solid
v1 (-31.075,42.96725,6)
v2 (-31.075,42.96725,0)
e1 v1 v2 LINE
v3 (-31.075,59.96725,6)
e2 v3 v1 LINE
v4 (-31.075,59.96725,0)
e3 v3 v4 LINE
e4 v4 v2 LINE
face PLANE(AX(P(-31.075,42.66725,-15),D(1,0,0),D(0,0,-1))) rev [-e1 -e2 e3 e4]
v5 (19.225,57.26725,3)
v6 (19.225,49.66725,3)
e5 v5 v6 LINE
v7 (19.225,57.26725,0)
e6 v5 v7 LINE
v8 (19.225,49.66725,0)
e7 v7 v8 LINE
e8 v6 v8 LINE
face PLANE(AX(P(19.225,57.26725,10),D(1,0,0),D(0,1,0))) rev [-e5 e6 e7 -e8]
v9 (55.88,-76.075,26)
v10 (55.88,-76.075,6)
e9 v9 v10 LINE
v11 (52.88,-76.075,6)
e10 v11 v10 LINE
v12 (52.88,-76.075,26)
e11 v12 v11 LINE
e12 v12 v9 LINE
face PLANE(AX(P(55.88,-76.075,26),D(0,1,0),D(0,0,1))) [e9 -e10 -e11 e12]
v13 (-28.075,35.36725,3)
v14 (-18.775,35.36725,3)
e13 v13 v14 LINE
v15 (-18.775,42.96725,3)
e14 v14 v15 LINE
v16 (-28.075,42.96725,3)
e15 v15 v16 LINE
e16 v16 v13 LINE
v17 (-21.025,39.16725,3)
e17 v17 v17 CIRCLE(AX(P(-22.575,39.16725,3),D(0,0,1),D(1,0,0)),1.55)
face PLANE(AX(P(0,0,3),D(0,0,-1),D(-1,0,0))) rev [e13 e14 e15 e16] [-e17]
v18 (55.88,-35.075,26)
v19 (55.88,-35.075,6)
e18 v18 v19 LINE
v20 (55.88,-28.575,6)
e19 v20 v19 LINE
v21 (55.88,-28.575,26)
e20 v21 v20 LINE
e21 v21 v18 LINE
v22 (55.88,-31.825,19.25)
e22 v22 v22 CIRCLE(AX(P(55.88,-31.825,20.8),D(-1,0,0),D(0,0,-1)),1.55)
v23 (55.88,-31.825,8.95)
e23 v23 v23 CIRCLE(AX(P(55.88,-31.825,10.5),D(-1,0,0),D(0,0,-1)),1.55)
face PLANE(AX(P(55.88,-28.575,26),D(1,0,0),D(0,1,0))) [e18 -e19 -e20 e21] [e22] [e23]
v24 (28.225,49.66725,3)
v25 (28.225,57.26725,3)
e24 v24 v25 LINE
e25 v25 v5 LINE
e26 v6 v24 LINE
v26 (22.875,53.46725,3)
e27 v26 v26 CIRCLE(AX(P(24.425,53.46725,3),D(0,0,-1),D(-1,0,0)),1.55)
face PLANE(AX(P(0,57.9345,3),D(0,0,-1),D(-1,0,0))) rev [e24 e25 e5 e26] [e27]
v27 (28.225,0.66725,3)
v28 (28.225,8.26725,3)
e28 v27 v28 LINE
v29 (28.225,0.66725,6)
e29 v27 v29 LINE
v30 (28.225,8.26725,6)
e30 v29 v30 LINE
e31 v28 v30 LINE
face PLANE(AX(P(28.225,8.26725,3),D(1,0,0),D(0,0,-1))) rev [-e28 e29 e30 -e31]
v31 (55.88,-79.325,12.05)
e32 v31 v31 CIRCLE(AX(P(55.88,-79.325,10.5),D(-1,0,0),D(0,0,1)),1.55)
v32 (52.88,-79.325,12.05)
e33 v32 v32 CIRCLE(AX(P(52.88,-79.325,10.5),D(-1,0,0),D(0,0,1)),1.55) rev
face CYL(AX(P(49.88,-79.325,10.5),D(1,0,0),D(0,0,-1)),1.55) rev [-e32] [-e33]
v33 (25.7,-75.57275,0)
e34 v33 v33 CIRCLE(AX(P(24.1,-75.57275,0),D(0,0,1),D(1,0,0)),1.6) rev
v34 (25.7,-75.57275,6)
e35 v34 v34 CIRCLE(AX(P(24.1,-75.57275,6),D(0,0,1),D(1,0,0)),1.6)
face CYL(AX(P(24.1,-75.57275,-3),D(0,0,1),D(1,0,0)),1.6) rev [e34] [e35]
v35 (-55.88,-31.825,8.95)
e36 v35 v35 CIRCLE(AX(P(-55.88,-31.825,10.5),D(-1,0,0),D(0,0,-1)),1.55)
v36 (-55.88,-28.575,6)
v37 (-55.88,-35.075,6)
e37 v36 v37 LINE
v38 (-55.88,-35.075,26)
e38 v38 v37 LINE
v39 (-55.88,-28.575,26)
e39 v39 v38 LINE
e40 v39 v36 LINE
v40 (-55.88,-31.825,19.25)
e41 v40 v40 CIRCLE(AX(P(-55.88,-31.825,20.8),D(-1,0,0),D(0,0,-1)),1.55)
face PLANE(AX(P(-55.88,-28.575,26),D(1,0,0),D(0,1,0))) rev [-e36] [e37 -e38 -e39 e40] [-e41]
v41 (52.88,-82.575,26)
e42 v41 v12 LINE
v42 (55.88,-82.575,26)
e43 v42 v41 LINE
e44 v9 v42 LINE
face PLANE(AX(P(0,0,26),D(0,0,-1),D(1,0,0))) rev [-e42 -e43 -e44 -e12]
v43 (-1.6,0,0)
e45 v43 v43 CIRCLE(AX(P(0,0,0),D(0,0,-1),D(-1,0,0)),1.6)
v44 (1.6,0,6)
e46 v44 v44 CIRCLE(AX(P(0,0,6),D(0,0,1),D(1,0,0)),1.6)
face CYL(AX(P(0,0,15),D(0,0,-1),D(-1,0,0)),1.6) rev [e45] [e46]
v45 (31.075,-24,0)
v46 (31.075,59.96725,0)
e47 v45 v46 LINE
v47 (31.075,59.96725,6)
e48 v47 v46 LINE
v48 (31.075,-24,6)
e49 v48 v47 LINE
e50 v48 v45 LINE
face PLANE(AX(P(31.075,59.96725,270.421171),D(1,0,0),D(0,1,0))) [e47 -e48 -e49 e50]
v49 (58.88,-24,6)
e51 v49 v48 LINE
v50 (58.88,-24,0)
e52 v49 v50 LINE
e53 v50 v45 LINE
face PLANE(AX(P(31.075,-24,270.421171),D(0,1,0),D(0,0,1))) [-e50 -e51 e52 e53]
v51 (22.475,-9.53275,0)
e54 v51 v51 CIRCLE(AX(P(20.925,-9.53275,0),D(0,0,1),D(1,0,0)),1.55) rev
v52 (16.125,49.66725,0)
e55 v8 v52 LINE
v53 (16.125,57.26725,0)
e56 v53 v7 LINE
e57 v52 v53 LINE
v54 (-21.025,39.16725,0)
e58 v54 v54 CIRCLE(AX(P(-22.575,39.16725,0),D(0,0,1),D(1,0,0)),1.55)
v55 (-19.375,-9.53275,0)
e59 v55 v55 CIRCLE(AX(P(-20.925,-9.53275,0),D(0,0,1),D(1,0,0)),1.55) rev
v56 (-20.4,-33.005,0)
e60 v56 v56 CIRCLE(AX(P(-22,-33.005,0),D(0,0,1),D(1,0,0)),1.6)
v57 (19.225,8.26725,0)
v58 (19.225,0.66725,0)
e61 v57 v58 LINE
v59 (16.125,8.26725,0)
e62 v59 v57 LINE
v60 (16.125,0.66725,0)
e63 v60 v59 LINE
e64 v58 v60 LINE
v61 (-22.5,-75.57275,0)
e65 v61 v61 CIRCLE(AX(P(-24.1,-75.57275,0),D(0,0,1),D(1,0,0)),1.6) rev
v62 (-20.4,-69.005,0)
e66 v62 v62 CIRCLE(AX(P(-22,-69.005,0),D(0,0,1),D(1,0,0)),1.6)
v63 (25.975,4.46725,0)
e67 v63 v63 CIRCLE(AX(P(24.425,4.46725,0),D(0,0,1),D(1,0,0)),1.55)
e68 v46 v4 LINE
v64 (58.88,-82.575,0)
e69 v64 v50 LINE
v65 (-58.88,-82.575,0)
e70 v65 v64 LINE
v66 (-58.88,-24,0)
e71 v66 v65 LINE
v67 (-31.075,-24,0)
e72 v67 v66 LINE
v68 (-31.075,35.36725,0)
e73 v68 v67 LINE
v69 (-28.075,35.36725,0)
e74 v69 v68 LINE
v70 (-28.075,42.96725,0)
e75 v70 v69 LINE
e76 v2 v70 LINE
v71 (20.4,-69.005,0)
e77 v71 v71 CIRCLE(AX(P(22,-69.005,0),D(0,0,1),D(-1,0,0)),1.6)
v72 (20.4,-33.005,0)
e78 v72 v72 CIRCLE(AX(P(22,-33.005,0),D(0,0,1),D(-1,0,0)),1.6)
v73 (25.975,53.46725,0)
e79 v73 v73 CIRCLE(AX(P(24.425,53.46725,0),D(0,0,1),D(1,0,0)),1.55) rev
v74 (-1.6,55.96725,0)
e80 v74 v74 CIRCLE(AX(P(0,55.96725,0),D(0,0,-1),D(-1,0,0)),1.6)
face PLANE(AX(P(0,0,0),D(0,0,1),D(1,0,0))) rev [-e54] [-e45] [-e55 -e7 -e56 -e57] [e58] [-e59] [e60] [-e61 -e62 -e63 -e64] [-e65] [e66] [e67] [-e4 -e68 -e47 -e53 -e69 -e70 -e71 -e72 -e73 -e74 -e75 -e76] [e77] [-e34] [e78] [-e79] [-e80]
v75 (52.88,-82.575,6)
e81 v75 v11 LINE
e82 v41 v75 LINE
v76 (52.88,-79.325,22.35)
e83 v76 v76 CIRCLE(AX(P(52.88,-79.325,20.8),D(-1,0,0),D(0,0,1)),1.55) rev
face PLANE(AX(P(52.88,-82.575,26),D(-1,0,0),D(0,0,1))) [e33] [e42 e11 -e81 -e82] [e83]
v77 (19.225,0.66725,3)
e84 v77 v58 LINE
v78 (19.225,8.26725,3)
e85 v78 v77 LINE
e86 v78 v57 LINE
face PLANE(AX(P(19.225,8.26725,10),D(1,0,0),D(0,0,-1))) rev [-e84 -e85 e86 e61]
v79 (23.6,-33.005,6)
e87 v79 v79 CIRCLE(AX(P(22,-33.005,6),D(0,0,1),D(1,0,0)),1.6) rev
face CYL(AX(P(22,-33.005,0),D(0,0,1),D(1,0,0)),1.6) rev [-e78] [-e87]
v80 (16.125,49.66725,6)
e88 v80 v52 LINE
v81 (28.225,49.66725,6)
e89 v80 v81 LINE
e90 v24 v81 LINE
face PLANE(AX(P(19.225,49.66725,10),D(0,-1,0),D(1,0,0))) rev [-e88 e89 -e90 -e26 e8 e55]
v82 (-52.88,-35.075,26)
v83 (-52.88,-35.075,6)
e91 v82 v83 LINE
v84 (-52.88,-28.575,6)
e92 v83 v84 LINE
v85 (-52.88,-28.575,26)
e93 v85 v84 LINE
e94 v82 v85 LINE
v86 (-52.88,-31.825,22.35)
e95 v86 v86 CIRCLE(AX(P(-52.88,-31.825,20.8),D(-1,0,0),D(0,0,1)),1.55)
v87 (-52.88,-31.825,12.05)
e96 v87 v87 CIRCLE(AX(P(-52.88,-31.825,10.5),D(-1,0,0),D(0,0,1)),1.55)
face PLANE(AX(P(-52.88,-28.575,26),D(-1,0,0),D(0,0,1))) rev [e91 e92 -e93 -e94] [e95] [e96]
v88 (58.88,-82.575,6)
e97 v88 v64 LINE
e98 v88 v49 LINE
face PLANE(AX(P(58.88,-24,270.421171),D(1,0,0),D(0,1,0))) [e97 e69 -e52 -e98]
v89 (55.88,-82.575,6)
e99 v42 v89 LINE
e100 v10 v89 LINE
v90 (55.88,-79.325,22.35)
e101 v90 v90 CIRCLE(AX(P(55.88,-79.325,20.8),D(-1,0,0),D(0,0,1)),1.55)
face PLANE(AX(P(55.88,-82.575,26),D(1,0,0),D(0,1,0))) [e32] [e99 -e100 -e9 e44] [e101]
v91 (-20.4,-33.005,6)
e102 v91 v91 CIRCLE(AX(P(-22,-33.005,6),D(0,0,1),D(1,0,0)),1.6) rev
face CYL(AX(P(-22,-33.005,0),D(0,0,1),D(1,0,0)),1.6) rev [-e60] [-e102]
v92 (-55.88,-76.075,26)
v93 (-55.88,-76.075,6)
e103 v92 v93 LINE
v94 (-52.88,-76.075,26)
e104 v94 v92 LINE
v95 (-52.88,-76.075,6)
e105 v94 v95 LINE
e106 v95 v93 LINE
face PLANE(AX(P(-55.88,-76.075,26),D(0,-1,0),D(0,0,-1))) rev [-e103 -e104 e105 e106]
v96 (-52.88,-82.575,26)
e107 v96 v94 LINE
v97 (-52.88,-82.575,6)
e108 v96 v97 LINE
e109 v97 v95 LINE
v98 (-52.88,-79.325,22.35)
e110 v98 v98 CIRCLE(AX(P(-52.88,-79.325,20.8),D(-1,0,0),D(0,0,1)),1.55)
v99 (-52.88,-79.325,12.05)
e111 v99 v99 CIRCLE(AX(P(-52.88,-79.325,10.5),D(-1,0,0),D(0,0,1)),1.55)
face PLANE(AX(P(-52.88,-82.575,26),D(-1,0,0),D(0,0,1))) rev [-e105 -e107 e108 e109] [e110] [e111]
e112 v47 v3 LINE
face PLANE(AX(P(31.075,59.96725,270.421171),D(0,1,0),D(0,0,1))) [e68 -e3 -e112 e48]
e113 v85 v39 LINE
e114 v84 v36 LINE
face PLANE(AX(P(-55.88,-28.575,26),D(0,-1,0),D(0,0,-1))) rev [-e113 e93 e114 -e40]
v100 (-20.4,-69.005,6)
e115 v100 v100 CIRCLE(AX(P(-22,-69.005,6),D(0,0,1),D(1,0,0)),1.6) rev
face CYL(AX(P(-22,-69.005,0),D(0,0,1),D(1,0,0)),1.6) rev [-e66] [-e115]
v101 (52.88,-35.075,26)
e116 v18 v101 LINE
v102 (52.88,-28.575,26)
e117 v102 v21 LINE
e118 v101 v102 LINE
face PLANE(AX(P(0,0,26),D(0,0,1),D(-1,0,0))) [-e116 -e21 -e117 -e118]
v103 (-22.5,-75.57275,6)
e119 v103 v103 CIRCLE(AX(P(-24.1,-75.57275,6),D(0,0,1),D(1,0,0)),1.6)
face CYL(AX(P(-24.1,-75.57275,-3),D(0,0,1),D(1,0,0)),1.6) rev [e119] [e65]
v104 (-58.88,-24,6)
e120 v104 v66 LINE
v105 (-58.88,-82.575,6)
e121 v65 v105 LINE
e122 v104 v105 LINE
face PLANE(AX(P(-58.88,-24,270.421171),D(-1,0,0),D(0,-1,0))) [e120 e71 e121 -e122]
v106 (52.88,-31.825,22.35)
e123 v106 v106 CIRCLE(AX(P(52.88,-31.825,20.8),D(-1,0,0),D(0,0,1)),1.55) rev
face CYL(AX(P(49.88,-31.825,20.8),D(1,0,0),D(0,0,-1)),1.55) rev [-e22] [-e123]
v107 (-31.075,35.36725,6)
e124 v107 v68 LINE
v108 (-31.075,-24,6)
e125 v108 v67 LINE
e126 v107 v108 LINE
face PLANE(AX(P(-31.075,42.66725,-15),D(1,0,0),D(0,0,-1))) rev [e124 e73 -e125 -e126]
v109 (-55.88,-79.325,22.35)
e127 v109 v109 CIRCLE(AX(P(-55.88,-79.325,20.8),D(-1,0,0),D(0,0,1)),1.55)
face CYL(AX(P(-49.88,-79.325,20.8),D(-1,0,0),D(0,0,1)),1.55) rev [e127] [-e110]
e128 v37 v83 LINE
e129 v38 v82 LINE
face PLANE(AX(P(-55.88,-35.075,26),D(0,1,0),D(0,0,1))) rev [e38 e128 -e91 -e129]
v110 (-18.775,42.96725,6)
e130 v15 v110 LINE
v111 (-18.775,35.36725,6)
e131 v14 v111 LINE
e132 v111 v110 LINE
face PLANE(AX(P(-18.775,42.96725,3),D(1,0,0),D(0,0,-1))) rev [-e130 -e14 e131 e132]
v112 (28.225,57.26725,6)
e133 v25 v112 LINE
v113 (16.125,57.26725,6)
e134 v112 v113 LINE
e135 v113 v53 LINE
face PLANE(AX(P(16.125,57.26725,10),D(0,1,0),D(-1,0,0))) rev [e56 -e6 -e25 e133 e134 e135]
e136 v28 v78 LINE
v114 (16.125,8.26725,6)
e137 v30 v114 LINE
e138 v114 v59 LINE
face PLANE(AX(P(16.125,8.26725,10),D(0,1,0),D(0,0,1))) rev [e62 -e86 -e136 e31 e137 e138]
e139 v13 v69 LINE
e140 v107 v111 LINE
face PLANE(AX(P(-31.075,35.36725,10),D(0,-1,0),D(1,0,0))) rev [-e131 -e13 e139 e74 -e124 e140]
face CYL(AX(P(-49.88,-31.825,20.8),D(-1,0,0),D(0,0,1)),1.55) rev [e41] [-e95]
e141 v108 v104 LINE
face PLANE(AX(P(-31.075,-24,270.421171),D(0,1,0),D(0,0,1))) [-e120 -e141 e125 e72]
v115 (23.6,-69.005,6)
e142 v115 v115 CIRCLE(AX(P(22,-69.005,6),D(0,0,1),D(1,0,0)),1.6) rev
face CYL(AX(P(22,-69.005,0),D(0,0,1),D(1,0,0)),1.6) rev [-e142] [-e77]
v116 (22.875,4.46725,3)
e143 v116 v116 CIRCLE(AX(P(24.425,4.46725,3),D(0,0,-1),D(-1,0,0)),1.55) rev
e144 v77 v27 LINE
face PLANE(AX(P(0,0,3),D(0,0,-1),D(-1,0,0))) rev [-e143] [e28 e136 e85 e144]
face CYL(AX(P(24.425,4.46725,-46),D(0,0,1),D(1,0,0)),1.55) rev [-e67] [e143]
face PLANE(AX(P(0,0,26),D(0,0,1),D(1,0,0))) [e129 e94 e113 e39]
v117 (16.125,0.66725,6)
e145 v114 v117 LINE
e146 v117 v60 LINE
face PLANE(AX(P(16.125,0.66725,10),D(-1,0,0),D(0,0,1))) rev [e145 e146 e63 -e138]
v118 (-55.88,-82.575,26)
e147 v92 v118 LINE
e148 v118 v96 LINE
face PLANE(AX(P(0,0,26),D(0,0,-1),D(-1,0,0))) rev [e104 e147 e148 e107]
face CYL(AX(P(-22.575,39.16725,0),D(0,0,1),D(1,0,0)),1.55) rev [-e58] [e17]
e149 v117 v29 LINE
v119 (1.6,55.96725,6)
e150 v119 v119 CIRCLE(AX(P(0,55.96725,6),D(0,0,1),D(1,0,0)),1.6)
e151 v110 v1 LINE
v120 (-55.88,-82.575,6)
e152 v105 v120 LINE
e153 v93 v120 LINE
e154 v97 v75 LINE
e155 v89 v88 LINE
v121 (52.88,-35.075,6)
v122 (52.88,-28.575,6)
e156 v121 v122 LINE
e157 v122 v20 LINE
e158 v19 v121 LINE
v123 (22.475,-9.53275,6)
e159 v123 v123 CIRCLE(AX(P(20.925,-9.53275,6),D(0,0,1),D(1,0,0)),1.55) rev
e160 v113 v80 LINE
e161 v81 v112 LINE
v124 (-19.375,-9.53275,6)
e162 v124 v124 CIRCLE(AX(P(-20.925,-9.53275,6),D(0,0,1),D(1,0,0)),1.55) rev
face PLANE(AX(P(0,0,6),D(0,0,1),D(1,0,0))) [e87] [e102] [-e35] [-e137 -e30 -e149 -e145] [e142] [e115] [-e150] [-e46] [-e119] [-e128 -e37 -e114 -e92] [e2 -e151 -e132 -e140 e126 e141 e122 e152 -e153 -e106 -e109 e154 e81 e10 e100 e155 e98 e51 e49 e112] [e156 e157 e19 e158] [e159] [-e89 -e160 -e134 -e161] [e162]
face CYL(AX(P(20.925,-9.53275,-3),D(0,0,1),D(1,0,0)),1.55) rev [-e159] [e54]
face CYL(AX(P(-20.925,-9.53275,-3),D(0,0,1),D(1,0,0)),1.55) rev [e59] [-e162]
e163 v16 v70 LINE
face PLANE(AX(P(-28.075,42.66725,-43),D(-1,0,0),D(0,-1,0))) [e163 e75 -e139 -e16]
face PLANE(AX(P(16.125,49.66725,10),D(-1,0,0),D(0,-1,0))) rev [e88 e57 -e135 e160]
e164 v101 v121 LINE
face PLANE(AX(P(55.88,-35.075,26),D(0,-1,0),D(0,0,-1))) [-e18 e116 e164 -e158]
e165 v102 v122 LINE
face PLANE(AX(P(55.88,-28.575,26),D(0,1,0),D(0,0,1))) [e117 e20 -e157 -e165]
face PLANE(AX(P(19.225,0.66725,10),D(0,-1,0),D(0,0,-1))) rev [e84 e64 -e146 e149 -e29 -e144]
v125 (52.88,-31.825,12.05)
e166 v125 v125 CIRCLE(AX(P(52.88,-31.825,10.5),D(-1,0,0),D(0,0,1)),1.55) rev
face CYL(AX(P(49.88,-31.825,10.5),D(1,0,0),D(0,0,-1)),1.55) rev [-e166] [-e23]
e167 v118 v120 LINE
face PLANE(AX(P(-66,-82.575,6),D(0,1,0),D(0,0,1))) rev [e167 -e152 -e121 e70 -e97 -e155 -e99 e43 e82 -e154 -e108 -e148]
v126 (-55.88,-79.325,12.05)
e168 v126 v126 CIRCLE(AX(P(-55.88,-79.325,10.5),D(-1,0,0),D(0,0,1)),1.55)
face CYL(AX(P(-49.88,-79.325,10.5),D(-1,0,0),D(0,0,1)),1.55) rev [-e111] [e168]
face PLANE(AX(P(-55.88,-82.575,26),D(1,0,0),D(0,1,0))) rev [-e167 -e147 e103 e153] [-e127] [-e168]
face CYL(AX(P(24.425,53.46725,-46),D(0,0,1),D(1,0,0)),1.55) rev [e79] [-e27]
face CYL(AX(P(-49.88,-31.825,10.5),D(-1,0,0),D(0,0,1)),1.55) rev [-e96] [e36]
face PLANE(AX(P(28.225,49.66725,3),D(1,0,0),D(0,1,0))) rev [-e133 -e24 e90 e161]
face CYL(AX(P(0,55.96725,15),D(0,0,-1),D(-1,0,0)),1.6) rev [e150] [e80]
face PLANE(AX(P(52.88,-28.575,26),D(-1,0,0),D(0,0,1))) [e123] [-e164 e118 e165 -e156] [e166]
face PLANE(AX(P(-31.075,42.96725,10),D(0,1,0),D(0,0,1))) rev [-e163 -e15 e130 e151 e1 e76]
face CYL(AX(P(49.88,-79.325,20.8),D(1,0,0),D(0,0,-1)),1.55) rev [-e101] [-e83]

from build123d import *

# Parameters (mm, degrees)
SKETCH1_W               = 132
SKETCH1_H               = 165.15
BOSS_EXTRUDE1_DEPTH     = 6
SKETCH3_W               = 32
SKETCH3_H               = 54
SKETCH3_W_2             = 26
SKETCH3_H_2             = 48
BOSS_EXTRUDE2_DEPTH     = 17.5
SKETCH4_W               = 32
SKETCH4_H               = 54
BOSS_EXTRUDE3_DEPTH     = 3
SKETCH5_W               = 25
SKETCH5_H               = 17
CUT_EXTRUDE1_DEPTH      = 3
SKETCH6_W               = 12
SKETCH6_H               = 54
BOSS_EXTRUDE4_DEPTH     = 3
SKETCH7_R               = 1.6
CUT_EXTRUDE2_DEPTH      = 108.148871319
SKETCH8_W               = 3
SKETCH8_H               = 6.5
BOSS_EXTRUDE5_DEPTH     = 20
SKETCH9_R               = 1.55
CUT_EXTRUDE3_DEPTH      = 6
CUT_EXTRUDE4_DEPTH      = 3
CUT_EXTRUDE4_DEPTH_BACK = 109.981102146
SKETCH10_R              = 1.6
SKETCH10_R_2            = 1.55
SKETCH11_W              = 2.5
SKETCH11_H              = 7
BOSS_EXTRUDE6_DEPTH     = 19.36
SKETCH12_R              = 1.6
CUT_EXTRUDE5_DEPTH      = 19.36
SKETCH13_W              = 3
SKETCH13_H              = 7
BOSS_EXTRUDE7_DEPTH     = 15
SKETCH14_R              = 2
CUT_EXTRUDE6_DEPTH      = 15
CUT_EXTRUDE7_START      = -6
CUT_EXTRUDE7_DEPTH      = 6
SKETCH16_R              = 1.6
CUT_EXTRUDE8_DEPTH      = 15
SKETCH17_W              = 61.848581877
SKETCH17_H              = 62.95797348
CUT_EXTRUDE9_DEPTH      = 52
SKETCH19_R              = 1.55
CUT_EXTRUDE10_DEPTH     = 52
CUT_EXTRUDE11_DEPTH     = 3
SKETCH21_W              = 2.5
SKETCH21_H              = 7
CUT_EXTRUDE12_DEPTH     = 49
SKETCH22_W              = 3
SKETCH22_H              = 7
CUT_EXTRUDE13_DEPTH     = 49
SKETCH22_3_W            = 3
SKETCH22_3_H            = 7
SKETCH22_3_W_2          = 9
CUT_EXTRUDE14_DEPTH     = 3
SKETCH23_R              = 1.55
CUT_EXTRUDE15_DEPTH     = 3
SKETCH26_W              = 3
SKETCH26_H              = 7.6
SKETCH26_W_2            = 3.1
CUT_EXTRUDE17_DEPTH     = 10
SKETCH27_W              = 9.3
SKETCH27_H              = 7.6
SKETCH27_W_2            = 9
CUT_EXTRUDE18_DEPTH     = 3


# Read off the part's stored shape, not the designer's step: Cut-Extrude7
with BuildPart() as part:
    # Sketch1 → Boss-Extrude1 (new body)
    with BuildSketch(Plane.XY):
        Rectangle(SKETCH1_W, SKETCH1_H)
    extrude(amount=BOSS_EXTRUDE1_DEPTH)

    # Sketch3 → Boss-Extrude2 (add)
    with BuildSketch(Plane.XY.offset(6)):
        with Locations((0, -55.575)):
            Rectangle(SKETCH3_W, SKETCH3_H)
        with Locations((0, -55.575)):
            Rectangle(SKETCH3_W_2, SKETCH3_H_2, mode=Mode.SUBTRACT)
    extrude(amount=BOSS_EXTRUDE2_DEPTH)

    # Sketch4 → Boss-Extrude3 (add)
    with BuildSketch(Plane.XY.offset(23.5)):
        with Locations((0, -55.575)):
            Rectangle(SKETCH4_W, SKETCH4_H)
    extrude(amount=BOSS_EXTRUDE3_DEPTH)

    # Sketch5 → Cut-Extrude1 (cut)
    with BuildSketch(Plane.XZ.offset(82.575)):
        with Locations((0, 14.5)):
            Rectangle(SKETCH5_W, SKETCH5_H)
    extrude(amount=-CUT_EXTRUDE1_DEPTH, mode=Mode.SUBTRACT)

    # Sketch6 → Boss-Extrude4 (add)
    with BuildSketch(Plane.XY.offset(6)):
        with Locations((-22, -55.575)):
            Rectangle(SKETCH6_W, SKETCH6_H)
        with Locations((22, -55.575)):
            Rectangle(SKETCH6_W, SKETCH6_H)
    extrude(amount=BOSS_EXTRUDE4_DEPTH)

    # Sketch7 → Cut-Extrude2 (cut, through all)
    with BuildSketch(Plane.XY.offset(9)):
        with Locations((-22, -69.005)):
            Circle(SKETCH7_R)
        with Locations((-22, -33.005)):
            Circle(SKETCH7_R)
        with Locations(Location((22, -69.005, 0), (0, 0, 180))):
            Circle(SKETCH7_R)
        with Locations(Location((22, -33.005, 0), (0, 0, 180))):
            Circle(SKETCH7_R)
    extrude(amount=-CUT_EXTRUDE2_DEPTH, mode=Mode.SUBTRACT)

    # Sketch8 → Boss-Extrude5 (add)
    with BuildSketch(Plane.XY.offset(6)):
        with Locations((-54.38, -79.325)):
            Rectangle(SKETCH8_W, SKETCH8_H)
        with Locations((-54.38, -31.825)):
            Rectangle(SKETCH8_W, SKETCH8_H)
    boss_extrude5 = extrude(amount=BOSS_EXTRUDE5_DEPTH)

    # Sketch9 → Cut-Extrude3 (cut)
    with BuildSketch(Plane.ZY.offset(55.88)):
        with Locations((10.5, -79.325)):
            Circle(SKETCH9_R)
        with Locations((20.8, -79.325)):
            Circle(SKETCH9_R)
        with Locations((10.5, -31.825)):
            Circle(SKETCH9_R)
        with Locations((20.8, -31.825)):
            Circle(SKETCH9_R)
    cut_extrude3 = extrude(amount=-CUT_EXTRUDE3_DEPTH, mode=Mode.SUBTRACT)

    # Mirror1: Boss-Extrude5, Cut-Extrude3 across plane
    add(boss_extrude5.mirror(Plane(origin=(0, 0, 0), x_dir=(0, 0, 1), z_dir=(1, 0, 0))))
    add(cut_extrude3.mirror(Plane(origin=(0, 0, 0), x_dir=(0, 0, 1), z_dir=(1, 0, 0))), mode=Mode.SUBTRACT)

    # Sketch10 → Cut-Extrude4 (cut, two sides: drawn at the far end of the back side and taken through both)
    with BuildSketch(Plane(origin=(0, 0, 0), x_dir=(-1, 0, 0), z_dir=(0, 0, -1)).offset(-CUT_EXTRUDE4_DEPTH_BACK)):
        with Locations(Location((-24.1, -75.572749788, 0), (0, 0, 180))):
            Circle(SKETCH10_R)
        with Locations(Location((-20.925, -9.532749788, 0), (0, 0, 180))):
            Circle(SKETCH10_R_2)
        with Locations(Location((20.925, -9.532749788, 0), (0, 0, 180))):
            Circle(SKETCH10_R_2)
        with Locations(Location((24.1, -75.572749788, 0), (0, 0, 180))):
            Circle(SKETCH10_R)
    extrude(amount=CUT_EXTRUDE4_DEPTH + CUT_EXTRUDE4_DEPTH_BACK, mode=Mode.SUBTRACT)

    # Sketch11 → Boss-Extrude6 (add)
    with BuildSketch(Plane(origin=(0, 0, 0), x_dir=(-1, 0, 0), z_dir=(0, 0, -1))):
        with Locations((-17.675, 4.467250212)):
            Rectangle(SKETCH11_W, SKETCH11_H)
        with Locations((-17.675, 53.467250212)):
            Rectangle(SKETCH11_W, SKETCH11_H)
    extrude(amount=BOSS_EXTRUDE6_DEPTH)

    # Sketch12 → Cut-Extrude5 (cut)
    with BuildSketch(Plane(origin=(18.925, 0, 0), x_dir=(0, 0, -1), z_dir=(1, 0, 0))):
        with Locations(Location((4.5, 53.467250212, 0), (0, 0, 90))):
            Circle(SKETCH12_R)
        with Locations(Location((14.5, 53.467250212, 0), (0, 0, 90))):
            Circle(SKETCH12_R)
        with Locations(Location((4.5, 4.467250212, 0), (0, 0, 90))):
            Circle(SKETCH12_R)
        with Locations(Location((14.5, 4.467250212, 0), (0, 0, 90))):
            Circle(SKETCH12_R)
    extrude(amount=-CUT_EXTRUDE5_DEPTH, mode=Mode.SUBTRACT)

    # Sketch13 → Boss-Extrude7 (add)
    with BuildSketch(Plane(origin=(0, 0, 0), x_dir=(-1, 0, 0), z_dir=(0, 0, -1))):
        with Locations((29.575, 39.167250212)):
            Rectangle(SKETCH13_W, SKETCH13_H)
    extrude(amount=BOSS_EXTRUDE7_DEPTH)

    # Sketch14 → Cut-Extrude6 (cut)
    with BuildSketch(Plane.ZY.offset(31.075)):
        with Locations((-9.9, 39.167250212)):
            Circle(SKETCH14_R)
    extrude(amount=-CUT_EXTRUDE6_DEPTH, mode=Mode.SUBTRACT)

    # Cut-Extrude7 outline → Cut-Extrude7 (cut)
    with BuildSketch(Plane(origin=(0, 0, 0), x_dir=(-1, 0, 0), z_dir=(0, 0, -1)).offset(CUT_EXTRUDE7_START)):
        Polygon((-31.075, 59.967250212), (31.075, 59.967250212), (31.075, -24), (58.88, -24), (58.88, -82.575), (66, -82.575), (66, 82.575), (-66, 82.575), (-66, -82.575), (-58.88, -82.575), (-58.88, -24), (-31.075, -24), align=None)
    extrude(amount=CUT_EXTRUDE7_DEPTH, mode=Mode.SUBTRACT)

    # Sketch16 → Cut-Extrude8 (cut)
    with BuildSketch(Plane(origin=(0, 0, 0), x_dir=(-1, 0, 0), z_dir=(0, 0, -1))):
        Circle(SKETCH16_R)
        with Locations((0, 55.967250212)):
            Circle(SKETCH16_R)
    extrude(amount=-CUT_EXTRUDE8_DEPTH, mode=Mode.SUBTRACT)

    # Sketch17 → Cut-Extrude9 (cut)
    with BuildSketch(Plane.XY.offset(6)):
        with Locations((1.152470824, -55.437355719)):
            Rectangle(SKETCH17_W, SKETCH17_H)
    extrude(amount=CUT_EXTRUDE9_DEPTH, mode=Mode.SUBTRACT)

    # Sketch19 → Cut-Extrude10 (cut)
    with BuildSketch(Plane.XY.offset(6)):
        with Locations((24.425, 4.467250212)):
            Circle(SKETCH19_R)
    cut_extrude10 = extrude(amount=-CUT_EXTRUDE10_DEPTH, mode=Mode.SUBTRACT)

    # Sketch19<3> → Cut-Extrude11 (cut)
    with BuildSketch(Plane.XY.offset(6)):
        Polygon((18.925, 0.967250212), (16.425, 0.967250212), (16.425, 7.967250212), (18.925, 7.967250212), (27.925, 7.967250212), (27.925, 0.967250212), align=None)
    cut_extrude11 = extrude(amount=-CUT_EXTRUDE11_DEPTH, mode=Mode.SUBTRACT)

    # Sketch21 → Cut-Extrude12 (cut)
    with BuildSketch(Plane(origin=(0, 0, -19.36), x_dir=(-1, 0, 0), z_dir=(0, 0, -1))):
        with Locations((-17.675, 4.467250212)):
            Rectangle(SKETCH21_W, SKETCH21_H)
    cut_extrude12 = extrude(amount=-CUT_EXTRUDE12_DEPTH, mode=Mode.SUBTRACT)

    # Mirror2: Cut-Extrude10, Cut-Extrude11, Cut-Extrude12 across plane
    add(cut_extrude10.mirror(Plane(origin=(0, 28.967250212, 0), x_dir=(0, 0, 1), z_dir=(0, -1, 0))), mode=Mode.SUBTRACT)
    add(cut_extrude11.mirror(Plane(origin=(0, 28.967250212, 0), x_dir=(0, 0, 1), z_dir=(0, -1, 0))), mode=Mode.SUBTRACT)
    add(cut_extrude12.mirror(Plane(origin=(0, 28.967250212, 0), x_dir=(0, 0, 1), z_dir=(0, -1, 0))), mode=Mode.SUBTRACT)

    # Sketch22 → Cut-Extrude13 (cut)
    with BuildSketch(Plane.XY.offset(6)):
        with Locations((-29.575, 39.167250212)):
            Rectangle(SKETCH22_W, SKETCH22_H)
    extrude(amount=-CUT_EXTRUDE13_DEPTH, mode=Mode.SUBTRACT)

    # Sketch22<3> → Cut-Extrude14 (cut)
    with BuildSketch(Plane.XY.offset(6)):
        with Locations((-29.575, 39.167250212)):
            Rectangle(SKETCH22_3_W, SKETCH22_3_H)
        with Locations((-23.575, 39.167250212)):
            Rectangle(SKETCH22_3_W_2, SKETCH22_3_H)
    extrude(amount=-CUT_EXTRUDE14_DEPTH, mode=Mode.SUBTRACT)

    # Sketch23 → Cut-Extrude15 (cut)
    with BuildSketch(Plane.XY.offset(3)):
        with Locations((-22.575, 39.167250212)):
            Circle(SKETCH23_R)
    extrude(amount=-CUT_EXTRUDE15_DEPTH, mode=Mode.SUBTRACT)

    # Sketch26 → Cut-Extrude17 (cut)
    with BuildSketch(Plane(origin=(0, 0, 0), x_dir=(-1, 0, 0), z_dir=(0, 0, -1))):
        with Locations((29.575, 39.167250212)):
            Rectangle(SKETCH26_W, SKETCH26_H)
        with Locations((-17.675, 53.467250212)):
            Rectangle(SKETCH26_W_2, SKETCH26_H)
        with Locations((-17.675, 4.467250212)):
            Rectangle(SKETCH26_W_2, SKETCH26_H)
    extrude(amount=-CUT_EXTRUDE17_DEPTH, mode=Mode.SUBTRACT)

    # Sketch27 → Cut-Extrude18 (cut)
    with BuildSketch(Plane.XY.offset(6)):
        with Locations((-23.425, 39.167250212)):
            Rectangle(SKETCH27_W, SKETCH27_H)
        with Locations((23.725, 4.467250212)):
            Rectangle(SKETCH27_W_2, SKETCH27_H)
        with Locations((23.575, 53.467250212)):
            Rectangle(SKETCH27_W, SKETCH27_H)
    extrude(amount=-CUT_EXTRUDE18_DEPTH, mode=Mode.SUBTRACT)


solid = part.part
